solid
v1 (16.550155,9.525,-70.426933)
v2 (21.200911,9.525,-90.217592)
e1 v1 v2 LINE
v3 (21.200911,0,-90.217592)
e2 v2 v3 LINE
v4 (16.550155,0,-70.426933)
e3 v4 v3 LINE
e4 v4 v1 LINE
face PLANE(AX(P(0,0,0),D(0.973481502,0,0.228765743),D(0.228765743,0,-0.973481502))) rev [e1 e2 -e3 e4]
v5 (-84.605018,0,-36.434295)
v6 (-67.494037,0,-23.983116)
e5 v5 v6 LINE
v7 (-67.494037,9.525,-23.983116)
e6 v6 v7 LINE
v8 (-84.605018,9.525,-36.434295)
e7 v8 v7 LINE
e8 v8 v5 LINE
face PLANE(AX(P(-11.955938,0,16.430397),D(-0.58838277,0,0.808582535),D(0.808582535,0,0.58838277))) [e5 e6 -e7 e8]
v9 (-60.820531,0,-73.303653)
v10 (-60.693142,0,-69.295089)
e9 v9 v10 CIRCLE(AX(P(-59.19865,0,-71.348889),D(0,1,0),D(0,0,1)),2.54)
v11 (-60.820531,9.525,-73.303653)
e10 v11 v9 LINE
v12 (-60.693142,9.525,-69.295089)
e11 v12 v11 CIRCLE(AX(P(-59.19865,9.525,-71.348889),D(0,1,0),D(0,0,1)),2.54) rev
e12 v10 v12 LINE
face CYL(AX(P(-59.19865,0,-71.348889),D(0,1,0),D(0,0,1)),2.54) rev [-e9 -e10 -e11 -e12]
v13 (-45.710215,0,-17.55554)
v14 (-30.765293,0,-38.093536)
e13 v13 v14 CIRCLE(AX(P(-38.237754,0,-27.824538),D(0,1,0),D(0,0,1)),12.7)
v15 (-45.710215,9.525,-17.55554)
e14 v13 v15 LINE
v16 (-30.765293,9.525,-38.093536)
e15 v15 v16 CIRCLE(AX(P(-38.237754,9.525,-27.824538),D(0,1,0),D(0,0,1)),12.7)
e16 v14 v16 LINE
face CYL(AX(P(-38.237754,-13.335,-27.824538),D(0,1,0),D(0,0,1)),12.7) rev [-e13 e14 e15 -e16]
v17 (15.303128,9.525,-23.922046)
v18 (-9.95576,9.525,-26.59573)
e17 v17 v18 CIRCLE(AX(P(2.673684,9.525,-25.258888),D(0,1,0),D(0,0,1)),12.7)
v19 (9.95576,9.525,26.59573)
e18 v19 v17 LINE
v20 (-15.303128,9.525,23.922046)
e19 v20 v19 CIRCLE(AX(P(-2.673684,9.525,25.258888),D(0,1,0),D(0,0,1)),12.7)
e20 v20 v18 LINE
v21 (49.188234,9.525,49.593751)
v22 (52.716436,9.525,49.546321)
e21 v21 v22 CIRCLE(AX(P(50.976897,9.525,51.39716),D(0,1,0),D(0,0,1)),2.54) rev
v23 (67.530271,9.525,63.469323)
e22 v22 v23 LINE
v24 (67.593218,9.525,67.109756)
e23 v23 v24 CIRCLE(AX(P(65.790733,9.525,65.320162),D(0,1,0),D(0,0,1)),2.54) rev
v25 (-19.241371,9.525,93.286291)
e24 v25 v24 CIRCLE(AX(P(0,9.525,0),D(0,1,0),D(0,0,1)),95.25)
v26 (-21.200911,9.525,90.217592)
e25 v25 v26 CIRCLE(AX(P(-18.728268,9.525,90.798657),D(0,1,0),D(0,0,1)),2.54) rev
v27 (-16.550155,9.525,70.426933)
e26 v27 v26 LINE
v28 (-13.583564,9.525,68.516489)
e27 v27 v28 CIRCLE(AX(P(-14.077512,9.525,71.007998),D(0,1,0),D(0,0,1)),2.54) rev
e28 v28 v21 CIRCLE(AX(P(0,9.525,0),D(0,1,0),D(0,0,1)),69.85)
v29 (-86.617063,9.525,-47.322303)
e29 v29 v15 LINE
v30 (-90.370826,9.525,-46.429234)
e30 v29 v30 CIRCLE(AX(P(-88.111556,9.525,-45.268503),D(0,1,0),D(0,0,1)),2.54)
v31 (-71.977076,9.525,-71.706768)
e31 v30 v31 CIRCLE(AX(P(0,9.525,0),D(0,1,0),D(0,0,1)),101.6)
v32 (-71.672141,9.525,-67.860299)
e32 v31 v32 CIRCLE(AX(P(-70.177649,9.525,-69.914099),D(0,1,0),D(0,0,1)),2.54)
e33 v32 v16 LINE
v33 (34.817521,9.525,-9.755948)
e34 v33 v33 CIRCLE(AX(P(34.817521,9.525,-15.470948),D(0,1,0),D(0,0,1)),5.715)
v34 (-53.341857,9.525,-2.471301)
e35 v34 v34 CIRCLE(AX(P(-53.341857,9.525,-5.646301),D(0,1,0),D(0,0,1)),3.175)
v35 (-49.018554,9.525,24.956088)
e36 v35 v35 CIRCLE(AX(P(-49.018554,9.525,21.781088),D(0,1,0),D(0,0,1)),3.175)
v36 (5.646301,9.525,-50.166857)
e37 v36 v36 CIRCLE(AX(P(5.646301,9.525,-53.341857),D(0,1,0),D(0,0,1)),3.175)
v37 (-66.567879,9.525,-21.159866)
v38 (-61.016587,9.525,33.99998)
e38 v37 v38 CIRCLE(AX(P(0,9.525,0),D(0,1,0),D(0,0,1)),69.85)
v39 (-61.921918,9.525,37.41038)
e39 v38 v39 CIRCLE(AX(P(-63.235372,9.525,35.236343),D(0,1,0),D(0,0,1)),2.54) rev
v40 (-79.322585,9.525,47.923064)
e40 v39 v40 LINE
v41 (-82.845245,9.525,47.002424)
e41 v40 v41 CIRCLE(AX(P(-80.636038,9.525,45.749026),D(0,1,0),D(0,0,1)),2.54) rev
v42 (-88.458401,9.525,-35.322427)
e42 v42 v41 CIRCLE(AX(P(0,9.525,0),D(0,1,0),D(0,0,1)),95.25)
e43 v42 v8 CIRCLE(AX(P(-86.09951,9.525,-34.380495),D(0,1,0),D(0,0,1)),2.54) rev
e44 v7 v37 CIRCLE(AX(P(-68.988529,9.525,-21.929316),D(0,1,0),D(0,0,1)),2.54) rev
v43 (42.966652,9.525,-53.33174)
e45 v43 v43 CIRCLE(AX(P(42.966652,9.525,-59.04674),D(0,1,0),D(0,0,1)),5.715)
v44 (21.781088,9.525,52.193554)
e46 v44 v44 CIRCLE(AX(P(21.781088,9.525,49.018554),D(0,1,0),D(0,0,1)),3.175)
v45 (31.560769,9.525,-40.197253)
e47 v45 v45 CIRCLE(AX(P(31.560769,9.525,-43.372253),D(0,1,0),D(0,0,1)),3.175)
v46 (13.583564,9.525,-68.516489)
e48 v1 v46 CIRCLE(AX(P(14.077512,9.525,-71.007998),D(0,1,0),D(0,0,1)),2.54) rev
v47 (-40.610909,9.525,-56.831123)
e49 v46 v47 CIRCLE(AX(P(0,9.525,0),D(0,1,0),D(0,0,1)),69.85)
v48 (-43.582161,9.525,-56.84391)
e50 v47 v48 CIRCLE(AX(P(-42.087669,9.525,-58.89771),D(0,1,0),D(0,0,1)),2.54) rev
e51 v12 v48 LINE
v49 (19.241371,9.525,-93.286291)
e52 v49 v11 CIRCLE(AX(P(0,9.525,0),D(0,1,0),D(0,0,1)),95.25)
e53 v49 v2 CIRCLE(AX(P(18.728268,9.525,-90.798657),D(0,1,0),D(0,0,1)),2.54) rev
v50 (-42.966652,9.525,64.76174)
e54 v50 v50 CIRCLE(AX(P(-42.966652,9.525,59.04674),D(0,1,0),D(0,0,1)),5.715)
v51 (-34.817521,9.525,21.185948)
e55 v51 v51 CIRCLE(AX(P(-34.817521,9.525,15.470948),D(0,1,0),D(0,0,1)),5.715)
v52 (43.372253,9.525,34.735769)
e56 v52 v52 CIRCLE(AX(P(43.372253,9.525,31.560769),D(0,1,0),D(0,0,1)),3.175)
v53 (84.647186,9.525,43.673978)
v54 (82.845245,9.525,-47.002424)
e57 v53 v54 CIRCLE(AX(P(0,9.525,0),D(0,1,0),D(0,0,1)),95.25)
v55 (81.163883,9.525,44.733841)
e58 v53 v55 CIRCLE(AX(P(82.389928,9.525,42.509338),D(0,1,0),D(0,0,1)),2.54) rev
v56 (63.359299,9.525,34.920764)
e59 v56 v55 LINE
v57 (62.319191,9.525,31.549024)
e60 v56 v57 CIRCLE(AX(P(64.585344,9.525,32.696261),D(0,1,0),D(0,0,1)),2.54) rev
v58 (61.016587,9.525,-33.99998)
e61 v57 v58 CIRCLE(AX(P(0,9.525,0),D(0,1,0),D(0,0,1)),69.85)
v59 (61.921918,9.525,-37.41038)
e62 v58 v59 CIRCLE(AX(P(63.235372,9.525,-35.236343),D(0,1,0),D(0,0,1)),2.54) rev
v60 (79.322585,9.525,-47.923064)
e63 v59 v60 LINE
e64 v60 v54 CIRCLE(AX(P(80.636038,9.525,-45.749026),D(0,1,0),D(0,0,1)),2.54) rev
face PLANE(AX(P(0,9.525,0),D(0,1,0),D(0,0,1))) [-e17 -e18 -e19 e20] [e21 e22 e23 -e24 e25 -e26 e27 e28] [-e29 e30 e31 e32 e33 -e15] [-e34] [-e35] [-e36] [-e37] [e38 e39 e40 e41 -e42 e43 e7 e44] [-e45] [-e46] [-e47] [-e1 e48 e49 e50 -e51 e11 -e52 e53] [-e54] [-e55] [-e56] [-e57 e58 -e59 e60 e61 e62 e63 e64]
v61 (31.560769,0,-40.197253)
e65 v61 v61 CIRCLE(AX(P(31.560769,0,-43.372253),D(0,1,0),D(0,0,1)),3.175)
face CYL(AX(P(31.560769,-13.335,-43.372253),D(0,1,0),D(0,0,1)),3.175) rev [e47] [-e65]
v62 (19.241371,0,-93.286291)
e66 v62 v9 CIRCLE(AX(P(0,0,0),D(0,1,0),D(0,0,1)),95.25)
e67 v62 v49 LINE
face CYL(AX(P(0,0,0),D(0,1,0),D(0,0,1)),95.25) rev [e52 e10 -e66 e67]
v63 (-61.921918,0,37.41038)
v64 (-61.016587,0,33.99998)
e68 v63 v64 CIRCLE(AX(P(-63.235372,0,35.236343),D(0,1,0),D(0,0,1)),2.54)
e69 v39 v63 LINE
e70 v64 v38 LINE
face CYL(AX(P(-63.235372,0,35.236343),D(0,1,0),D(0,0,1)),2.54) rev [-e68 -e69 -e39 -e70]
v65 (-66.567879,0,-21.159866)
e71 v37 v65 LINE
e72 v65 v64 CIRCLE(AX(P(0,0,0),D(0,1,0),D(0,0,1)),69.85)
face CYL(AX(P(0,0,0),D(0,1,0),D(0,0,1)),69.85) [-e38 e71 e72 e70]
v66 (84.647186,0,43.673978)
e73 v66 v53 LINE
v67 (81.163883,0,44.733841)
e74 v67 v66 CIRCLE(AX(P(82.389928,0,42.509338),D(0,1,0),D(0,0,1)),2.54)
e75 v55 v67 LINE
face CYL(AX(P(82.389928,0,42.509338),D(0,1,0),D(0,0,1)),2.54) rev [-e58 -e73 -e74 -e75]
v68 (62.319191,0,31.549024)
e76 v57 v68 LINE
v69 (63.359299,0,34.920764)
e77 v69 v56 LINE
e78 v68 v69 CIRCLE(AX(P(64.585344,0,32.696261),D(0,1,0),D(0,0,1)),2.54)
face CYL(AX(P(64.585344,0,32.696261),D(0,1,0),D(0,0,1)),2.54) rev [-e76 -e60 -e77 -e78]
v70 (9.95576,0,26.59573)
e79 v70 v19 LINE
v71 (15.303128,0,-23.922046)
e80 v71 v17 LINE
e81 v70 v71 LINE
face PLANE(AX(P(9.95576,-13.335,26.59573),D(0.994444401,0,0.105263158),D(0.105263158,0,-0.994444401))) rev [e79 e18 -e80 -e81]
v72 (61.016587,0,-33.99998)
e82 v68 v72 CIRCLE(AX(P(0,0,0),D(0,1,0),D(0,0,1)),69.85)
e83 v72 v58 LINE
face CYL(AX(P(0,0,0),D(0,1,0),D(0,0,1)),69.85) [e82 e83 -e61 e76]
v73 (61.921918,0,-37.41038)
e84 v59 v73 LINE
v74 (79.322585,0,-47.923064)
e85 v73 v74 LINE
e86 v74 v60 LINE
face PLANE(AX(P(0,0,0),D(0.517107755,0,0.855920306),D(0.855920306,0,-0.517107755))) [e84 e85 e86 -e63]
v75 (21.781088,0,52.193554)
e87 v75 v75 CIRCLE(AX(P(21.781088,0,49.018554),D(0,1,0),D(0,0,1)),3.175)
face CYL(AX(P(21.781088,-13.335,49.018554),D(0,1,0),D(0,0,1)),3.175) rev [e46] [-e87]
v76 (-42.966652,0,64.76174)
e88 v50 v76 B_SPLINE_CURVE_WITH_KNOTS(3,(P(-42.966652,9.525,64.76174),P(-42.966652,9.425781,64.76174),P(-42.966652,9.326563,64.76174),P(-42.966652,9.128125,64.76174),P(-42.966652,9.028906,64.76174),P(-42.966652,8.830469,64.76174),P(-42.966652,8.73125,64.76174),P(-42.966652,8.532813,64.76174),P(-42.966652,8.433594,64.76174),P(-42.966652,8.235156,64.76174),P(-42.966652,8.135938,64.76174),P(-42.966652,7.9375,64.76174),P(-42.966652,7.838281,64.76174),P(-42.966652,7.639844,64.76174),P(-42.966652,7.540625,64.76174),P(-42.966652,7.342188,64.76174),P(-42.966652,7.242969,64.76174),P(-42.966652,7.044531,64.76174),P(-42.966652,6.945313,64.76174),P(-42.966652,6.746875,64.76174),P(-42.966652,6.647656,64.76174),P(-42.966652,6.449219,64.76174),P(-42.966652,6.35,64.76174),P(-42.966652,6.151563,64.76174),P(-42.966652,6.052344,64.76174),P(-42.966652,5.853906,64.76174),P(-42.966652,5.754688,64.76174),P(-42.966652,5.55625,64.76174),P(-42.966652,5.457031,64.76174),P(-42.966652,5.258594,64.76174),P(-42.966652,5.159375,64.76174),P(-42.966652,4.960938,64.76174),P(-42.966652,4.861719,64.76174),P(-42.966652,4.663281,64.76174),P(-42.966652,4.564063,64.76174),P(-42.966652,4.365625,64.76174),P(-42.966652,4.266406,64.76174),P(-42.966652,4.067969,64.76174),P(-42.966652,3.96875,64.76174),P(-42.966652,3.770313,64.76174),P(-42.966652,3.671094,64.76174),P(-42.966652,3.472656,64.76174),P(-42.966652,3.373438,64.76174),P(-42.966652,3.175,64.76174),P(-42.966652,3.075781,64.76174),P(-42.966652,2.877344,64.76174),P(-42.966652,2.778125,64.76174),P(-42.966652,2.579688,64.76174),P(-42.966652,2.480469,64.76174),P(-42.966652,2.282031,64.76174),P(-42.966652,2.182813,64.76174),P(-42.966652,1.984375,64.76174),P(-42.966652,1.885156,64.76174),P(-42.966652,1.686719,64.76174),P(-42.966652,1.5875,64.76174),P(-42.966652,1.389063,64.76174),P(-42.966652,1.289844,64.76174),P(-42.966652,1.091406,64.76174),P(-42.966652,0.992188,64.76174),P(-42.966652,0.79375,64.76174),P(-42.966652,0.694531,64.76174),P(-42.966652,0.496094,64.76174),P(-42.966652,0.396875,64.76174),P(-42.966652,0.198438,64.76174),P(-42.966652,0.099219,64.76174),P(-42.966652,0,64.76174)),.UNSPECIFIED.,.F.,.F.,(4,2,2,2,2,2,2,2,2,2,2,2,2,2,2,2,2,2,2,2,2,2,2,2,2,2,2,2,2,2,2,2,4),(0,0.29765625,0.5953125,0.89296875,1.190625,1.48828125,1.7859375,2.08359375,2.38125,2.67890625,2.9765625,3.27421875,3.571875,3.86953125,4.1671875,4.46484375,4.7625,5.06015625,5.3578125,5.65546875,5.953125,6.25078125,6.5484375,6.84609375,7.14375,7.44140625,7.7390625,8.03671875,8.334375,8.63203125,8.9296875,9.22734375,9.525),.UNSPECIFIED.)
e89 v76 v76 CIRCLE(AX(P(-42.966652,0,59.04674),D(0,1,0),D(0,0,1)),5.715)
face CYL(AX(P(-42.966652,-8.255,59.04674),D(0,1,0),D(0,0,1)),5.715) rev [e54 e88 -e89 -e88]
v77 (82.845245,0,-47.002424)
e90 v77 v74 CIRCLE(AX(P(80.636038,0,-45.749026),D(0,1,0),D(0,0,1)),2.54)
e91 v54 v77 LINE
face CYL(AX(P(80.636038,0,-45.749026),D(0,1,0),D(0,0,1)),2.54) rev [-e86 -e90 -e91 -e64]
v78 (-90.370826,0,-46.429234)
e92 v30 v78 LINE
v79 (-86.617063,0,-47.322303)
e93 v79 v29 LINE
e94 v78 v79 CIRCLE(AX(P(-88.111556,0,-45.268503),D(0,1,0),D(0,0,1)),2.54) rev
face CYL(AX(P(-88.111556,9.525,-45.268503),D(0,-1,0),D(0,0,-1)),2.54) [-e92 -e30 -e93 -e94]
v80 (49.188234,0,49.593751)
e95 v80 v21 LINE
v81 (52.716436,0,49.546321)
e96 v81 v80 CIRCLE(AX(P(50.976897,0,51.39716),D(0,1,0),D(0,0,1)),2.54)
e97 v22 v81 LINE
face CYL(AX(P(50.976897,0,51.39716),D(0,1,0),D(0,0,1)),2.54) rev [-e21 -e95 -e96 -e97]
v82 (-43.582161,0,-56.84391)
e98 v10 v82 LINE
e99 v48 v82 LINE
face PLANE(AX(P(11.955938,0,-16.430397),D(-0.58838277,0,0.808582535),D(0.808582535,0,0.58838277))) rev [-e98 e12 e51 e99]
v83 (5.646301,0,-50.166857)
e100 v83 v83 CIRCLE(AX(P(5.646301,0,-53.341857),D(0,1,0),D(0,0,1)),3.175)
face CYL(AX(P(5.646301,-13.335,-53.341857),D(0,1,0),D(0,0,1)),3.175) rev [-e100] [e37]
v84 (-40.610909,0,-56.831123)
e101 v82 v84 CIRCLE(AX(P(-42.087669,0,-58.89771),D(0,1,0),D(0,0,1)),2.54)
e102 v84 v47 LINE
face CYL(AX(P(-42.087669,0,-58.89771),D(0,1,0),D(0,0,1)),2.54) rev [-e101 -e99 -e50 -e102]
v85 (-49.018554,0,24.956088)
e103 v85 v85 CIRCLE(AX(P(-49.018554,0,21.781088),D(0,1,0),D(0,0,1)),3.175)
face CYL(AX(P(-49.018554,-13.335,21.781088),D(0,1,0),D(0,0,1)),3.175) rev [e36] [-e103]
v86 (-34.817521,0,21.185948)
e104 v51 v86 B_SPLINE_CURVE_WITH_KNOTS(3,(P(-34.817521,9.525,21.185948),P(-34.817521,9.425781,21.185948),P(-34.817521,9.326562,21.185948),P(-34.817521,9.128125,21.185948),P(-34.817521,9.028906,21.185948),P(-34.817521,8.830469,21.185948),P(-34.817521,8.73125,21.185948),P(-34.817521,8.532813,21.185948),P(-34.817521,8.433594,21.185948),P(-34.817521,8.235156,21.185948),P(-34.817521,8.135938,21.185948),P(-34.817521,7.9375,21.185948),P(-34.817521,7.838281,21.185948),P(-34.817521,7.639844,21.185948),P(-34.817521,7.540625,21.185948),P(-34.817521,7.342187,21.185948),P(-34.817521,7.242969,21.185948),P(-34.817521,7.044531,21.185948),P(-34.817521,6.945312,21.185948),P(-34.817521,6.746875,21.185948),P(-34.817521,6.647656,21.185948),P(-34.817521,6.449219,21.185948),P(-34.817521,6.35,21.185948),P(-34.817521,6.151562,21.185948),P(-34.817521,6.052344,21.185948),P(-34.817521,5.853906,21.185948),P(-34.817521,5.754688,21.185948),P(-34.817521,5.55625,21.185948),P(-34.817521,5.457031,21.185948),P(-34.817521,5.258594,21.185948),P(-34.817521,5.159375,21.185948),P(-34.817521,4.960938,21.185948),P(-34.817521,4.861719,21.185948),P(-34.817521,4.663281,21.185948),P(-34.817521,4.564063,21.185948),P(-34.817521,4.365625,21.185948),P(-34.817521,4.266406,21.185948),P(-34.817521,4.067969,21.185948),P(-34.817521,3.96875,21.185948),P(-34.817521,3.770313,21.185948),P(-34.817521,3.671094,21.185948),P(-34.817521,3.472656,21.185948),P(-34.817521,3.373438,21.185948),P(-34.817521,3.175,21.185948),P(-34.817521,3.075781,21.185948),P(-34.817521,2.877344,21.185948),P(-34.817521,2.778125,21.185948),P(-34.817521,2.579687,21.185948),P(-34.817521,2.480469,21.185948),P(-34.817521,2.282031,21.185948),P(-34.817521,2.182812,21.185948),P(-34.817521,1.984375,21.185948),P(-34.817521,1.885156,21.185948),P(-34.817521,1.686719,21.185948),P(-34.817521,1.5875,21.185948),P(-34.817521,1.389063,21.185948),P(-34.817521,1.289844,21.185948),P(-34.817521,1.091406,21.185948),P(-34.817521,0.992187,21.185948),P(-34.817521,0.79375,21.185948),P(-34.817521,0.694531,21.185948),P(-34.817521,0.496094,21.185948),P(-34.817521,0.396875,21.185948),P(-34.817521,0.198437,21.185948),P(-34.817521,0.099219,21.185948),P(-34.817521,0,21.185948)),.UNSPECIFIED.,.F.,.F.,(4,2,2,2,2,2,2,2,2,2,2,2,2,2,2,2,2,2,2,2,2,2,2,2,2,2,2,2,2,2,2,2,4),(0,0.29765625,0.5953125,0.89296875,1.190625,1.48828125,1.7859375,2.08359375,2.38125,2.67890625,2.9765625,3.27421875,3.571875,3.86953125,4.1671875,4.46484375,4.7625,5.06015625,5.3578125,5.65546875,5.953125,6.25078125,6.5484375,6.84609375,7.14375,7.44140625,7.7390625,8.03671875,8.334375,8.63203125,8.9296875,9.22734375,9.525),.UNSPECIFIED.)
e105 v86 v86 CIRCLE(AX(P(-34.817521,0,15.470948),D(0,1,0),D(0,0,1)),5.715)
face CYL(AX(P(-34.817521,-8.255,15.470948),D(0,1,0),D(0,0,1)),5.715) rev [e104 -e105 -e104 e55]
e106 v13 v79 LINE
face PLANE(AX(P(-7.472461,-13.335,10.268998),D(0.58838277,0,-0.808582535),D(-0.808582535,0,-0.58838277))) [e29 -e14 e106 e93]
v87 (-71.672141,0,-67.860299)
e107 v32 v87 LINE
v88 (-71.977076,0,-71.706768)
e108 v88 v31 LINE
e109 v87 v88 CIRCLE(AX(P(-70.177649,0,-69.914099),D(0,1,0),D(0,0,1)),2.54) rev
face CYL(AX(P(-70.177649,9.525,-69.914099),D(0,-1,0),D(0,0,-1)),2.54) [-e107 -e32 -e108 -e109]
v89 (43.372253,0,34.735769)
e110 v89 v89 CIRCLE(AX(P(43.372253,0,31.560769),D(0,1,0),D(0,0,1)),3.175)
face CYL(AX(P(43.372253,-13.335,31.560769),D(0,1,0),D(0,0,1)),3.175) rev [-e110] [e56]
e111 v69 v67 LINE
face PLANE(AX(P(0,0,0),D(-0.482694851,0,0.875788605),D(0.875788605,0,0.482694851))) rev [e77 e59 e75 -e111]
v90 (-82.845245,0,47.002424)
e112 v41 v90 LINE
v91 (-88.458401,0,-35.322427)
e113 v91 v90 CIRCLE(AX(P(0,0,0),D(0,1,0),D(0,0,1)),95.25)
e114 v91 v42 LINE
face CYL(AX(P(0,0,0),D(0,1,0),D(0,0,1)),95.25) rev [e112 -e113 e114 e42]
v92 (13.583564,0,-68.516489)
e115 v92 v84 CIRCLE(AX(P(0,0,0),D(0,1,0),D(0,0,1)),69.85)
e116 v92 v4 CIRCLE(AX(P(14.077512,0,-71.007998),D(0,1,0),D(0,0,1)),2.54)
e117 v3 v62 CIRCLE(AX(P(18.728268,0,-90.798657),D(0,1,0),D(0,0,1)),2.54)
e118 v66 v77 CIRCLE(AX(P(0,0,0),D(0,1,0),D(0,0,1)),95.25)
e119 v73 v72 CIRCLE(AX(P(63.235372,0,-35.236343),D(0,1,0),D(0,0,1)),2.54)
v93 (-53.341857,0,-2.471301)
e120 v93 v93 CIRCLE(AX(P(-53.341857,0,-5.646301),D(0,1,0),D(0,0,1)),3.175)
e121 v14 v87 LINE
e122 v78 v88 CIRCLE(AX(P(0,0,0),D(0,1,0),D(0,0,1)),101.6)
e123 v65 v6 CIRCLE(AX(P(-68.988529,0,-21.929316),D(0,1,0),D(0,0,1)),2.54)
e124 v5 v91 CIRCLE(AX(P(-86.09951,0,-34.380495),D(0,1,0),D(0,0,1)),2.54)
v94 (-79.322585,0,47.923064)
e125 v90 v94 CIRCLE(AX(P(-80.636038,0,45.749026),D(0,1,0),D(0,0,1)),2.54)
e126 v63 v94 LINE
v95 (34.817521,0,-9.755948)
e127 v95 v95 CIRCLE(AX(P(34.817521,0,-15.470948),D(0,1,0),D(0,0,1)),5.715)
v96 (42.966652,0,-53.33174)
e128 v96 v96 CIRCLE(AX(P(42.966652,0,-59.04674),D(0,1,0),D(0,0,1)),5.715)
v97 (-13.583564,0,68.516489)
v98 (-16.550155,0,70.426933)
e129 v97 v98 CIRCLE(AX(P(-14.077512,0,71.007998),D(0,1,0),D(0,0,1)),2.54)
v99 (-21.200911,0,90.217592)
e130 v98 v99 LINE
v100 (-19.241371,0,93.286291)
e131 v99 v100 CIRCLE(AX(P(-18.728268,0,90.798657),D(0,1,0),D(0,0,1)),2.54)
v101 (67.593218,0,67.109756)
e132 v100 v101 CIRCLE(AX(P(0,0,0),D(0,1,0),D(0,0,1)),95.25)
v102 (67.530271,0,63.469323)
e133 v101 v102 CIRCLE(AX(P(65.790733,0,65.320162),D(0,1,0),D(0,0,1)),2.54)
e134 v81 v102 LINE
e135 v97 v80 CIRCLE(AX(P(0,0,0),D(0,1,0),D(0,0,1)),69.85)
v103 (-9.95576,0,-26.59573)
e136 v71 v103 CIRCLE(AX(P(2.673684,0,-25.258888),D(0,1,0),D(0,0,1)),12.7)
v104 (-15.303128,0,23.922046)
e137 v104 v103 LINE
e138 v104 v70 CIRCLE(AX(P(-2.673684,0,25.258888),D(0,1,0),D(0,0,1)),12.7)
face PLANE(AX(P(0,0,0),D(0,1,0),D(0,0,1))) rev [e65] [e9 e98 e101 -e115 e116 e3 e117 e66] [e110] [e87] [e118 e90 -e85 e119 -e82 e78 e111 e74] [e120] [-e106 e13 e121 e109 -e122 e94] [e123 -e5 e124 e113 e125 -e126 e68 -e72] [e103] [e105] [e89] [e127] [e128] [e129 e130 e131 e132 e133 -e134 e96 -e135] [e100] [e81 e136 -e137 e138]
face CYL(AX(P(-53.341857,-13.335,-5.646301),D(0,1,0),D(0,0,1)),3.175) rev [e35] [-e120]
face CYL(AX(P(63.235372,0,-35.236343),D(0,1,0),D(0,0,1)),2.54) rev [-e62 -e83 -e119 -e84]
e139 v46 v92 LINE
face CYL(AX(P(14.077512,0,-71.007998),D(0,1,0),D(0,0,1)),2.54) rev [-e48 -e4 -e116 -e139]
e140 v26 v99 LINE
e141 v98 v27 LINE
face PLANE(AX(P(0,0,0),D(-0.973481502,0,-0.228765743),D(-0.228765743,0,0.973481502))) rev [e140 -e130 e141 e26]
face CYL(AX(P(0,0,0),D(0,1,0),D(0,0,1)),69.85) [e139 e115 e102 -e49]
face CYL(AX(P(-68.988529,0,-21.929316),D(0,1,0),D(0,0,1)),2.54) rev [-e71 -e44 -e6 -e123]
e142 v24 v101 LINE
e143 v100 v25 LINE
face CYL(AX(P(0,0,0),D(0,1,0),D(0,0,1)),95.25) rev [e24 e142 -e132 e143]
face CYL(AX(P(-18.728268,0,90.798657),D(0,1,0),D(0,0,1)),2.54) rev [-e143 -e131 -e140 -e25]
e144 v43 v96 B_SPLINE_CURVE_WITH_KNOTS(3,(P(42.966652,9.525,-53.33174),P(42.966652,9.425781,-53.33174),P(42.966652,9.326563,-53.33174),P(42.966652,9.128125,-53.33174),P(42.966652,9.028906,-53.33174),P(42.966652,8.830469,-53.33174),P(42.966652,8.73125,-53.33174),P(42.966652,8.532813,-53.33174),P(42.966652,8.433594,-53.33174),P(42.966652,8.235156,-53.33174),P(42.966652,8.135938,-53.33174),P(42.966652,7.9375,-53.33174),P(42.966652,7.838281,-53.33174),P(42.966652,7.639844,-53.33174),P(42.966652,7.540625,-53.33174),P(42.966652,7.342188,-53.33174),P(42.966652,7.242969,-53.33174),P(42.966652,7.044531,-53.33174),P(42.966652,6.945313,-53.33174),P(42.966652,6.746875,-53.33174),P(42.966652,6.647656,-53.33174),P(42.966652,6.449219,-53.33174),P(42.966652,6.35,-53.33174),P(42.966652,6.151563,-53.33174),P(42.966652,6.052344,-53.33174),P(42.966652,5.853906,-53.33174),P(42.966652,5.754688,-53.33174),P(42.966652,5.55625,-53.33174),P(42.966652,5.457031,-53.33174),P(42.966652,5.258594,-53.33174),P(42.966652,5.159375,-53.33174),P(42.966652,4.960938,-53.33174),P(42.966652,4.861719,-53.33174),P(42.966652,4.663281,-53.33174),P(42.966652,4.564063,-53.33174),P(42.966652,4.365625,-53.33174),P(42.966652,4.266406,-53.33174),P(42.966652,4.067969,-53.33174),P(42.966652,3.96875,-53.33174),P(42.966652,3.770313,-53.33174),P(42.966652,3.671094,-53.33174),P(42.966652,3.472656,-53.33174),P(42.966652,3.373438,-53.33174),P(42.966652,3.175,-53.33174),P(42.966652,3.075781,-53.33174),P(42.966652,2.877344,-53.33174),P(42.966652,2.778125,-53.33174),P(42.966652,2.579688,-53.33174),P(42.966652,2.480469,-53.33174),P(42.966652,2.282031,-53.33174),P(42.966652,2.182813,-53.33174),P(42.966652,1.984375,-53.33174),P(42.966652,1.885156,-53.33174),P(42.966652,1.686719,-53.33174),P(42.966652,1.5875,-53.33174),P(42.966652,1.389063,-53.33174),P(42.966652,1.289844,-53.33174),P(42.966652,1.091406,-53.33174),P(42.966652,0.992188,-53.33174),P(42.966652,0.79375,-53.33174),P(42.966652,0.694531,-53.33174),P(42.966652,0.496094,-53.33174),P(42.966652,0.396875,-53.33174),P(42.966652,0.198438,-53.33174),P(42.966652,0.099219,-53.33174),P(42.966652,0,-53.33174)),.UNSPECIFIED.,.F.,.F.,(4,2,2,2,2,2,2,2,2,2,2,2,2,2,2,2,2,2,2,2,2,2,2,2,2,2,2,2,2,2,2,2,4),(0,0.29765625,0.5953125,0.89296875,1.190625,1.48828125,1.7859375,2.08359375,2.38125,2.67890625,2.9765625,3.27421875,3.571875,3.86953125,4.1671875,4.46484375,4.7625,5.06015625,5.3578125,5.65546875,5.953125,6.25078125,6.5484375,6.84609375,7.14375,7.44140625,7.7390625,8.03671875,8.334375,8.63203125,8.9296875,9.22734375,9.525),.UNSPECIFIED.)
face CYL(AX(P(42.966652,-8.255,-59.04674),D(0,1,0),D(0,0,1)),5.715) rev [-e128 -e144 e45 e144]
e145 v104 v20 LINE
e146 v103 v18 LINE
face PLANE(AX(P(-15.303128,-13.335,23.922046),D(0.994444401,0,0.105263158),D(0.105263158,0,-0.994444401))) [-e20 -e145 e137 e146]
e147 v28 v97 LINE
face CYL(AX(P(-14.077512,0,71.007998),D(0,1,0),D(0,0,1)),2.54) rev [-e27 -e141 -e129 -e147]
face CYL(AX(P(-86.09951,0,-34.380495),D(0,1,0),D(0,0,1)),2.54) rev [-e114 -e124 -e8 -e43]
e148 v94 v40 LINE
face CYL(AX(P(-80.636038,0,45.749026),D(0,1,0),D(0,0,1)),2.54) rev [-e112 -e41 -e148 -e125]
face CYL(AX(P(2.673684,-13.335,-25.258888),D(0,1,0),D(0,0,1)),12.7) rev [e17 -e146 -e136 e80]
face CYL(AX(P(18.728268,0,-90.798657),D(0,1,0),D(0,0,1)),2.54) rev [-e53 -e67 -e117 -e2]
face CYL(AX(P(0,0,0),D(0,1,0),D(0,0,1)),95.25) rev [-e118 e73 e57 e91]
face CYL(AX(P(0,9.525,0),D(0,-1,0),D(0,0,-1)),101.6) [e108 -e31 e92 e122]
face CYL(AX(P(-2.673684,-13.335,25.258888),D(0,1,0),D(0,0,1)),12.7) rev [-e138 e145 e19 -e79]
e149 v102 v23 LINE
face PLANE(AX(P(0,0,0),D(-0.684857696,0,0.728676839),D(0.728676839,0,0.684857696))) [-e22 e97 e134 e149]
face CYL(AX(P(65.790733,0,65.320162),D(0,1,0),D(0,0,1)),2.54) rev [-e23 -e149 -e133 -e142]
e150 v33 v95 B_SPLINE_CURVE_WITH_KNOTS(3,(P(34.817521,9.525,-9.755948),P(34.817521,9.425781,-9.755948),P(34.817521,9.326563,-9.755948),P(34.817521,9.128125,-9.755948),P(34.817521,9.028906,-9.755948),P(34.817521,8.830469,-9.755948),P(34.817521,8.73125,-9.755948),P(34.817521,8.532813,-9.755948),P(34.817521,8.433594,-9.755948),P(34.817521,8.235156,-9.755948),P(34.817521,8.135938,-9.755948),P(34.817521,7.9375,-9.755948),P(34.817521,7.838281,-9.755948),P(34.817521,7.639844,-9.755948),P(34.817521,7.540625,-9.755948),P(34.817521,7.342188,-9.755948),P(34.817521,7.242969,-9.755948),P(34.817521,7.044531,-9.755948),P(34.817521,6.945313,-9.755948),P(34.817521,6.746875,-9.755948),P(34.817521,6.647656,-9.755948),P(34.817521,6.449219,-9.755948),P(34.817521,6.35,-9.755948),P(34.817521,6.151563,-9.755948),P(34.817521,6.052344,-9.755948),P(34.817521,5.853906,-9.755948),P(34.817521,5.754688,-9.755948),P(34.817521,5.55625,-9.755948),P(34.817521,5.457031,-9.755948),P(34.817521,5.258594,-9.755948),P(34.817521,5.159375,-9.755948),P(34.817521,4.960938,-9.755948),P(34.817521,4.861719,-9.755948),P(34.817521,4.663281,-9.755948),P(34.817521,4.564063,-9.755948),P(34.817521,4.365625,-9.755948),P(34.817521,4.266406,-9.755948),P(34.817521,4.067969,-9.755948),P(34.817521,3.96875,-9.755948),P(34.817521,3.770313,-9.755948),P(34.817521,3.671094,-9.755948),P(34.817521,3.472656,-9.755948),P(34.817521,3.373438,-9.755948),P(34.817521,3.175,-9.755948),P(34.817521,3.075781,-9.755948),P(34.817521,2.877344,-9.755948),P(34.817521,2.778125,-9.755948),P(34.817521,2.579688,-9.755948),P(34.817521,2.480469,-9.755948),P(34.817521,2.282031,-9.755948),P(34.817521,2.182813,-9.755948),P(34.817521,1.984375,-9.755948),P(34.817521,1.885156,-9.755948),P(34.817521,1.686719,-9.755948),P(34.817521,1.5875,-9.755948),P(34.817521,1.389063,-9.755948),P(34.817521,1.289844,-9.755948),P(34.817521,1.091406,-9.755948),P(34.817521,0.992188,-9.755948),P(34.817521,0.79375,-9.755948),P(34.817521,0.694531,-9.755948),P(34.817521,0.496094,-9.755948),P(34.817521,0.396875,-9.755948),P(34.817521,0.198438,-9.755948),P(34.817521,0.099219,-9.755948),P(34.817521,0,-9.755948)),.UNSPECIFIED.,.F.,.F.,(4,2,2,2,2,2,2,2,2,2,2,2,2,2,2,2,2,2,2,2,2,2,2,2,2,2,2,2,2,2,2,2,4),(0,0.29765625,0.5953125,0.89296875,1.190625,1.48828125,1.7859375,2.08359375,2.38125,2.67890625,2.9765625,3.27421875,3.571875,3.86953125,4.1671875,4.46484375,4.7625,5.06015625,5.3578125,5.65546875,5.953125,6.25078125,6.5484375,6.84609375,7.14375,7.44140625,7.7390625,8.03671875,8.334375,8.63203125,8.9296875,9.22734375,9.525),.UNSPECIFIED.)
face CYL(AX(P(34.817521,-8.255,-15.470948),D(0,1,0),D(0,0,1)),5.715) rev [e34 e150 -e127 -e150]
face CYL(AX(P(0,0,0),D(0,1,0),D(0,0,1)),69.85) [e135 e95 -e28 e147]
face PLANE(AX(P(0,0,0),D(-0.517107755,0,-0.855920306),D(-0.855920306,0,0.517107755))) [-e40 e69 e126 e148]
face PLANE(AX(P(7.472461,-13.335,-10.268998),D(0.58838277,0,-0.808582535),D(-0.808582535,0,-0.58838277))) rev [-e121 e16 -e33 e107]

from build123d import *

# Parameters (mm, degrees)
SKETCH1_R           = 101.6
BOSS_EXTRUDE1_DEPTH = 9.525
SKETCH2_R           = 4.7625
SKETCH2_R_2         = 3.175
CUT_EXTRUDE1_DEPTH  = 22.86
SKETCH3_R           = 4.7625
CUT_EXTRUDE2_DEPTH  = 144.999463975
FILLET1_R           = 2.54
FILLET3_R           = 2.54
SKETCH4_R           = 5.715
CUT_EXTRUDE3_DEPTH  = 17.78


with BuildPart() as part:
    # Sketch1 → Boss-Extrude1 (new body)
    with BuildSketch(Plane(origin=(0, 0, 0), x_dir=(1, 0, 0), z_dir=(0, 1, 0))):
        with Locations(Location((0, 0, 0), (0, 0, 90))):
            Circle(SKETCH1_R)
    extrude(amount=BOSS_EXTRUDE1_DEPTH)

    # Sketch2 → Cut-Extrude1 (cut)
    with BuildSketch(Plane(origin=(0, 9.525, 0), x_dir=(1, 0, 0), z_dir=(0, 1, 0))):
        with BuildLine():
            Line((-9.955759688, 26.595729902), (-15.303128109, -23.922045692))
            ThreePointArc((-15.303128109, -23.922045692), (-4.010526316, -37.888331696), (9.955759688, -26.595729902))
            Line((9.955759688, -26.595729902), (15.303128109, 23.922045692))
            ThreePointArc((15.303128109, 23.922045692), (4.010526316, 37.888331696), (-9.955759688, 26.595729902))
        make_face()
        with Locations(Location((34.817520913, 15.470948176, 0), (0, 0, 270))):
            Circle(SKETCH2_R)
        with Locations(Location((-34.817520913, -15.470948176, 0), (0, 0, 270))):
            Circle(SKETCH2_R)
        with BuildLine():
            Line((-30.765292524, 38.093536125), (-87.237043764, 79.186441231))
            Line((-87.237043764, 79.186441231), (-104.485964967, 60.325))
            Line((-104.485964967, 60.325), (-45.710214871, 17.555539727))
            ThreePointArc((-45.710214871, 17.555539727), (-27.968755498, 20.352076753), (-30.765292524, 38.093536125))
        make_face()
        with Locations(Location((5.646300897, 53.341856998, 0), (0, 0, 270))):
            Circle(SKETCH2_R_2)
        with Locations(Location((31.560768513, 43.372252797, 0), (0, 0, 270))):
            Circle(SKETCH2_R_2)
        with Locations(Location((-53.341856998, 5.646300897, 0), (0, 0, 270))):
            Circle(SKETCH2_R_2)
        with Locations(Location((43.372252797, -31.560768513, 0), (0, 0, 270))):
            Circle(SKETCH2_R_2)
        with Locations(Location((-49.018553694, -21.781088485, 0), (0, 0, 270))):
            Circle(SKETCH2_R_2)
        with Locations(Location((21.781088485, -49.018553694, 0), (0, 0, 270))):
            Circle(SKETCH2_R_2)
    extrude(amount=-CUT_EXTRUDE1_DEPTH, mode=Mode.SUBTRACT)

    # Sketch3 → Cut-Extrude2 (cut, through all)
    with BuildSketch(Plane(origin=(0, 9.525, 0), x_dir=(1, 0, 0), z_dir=(0, 1, 0))):
        with BuildLine():
            Line((61.173834056, -33.71623536), (83.418864622, -45.976684582))
            ThreePointArc((83.418864622, -45.976684582), (95.231198209, 1.892455481), (81.526409141, 49.254513627))
            Line((81.526409141, 49.254513627), (59.78603337, 36.119976659))
            ThreePointArc((59.78603337, 36.119976659), (69.83621202, 1.387800686), (61.173834056, -33.71623536))
        make_face()
        with BuildLine():
            ThreePointArc((50.898077232, -47.837310063), (20.160372855, -66.87736438), (-15.979287148, -67.997682918))
            Line((-15.979287148, -67.997682918), (-21.78993702, -92.72411307))
            ThreePointArc((-21.78993702, -92.72411307), (27.491417529, -91.196405972), (69.406468953, -65.232695541))
            Line((69.406468953, -65.232695541), (50.898077232, -47.837310063))
        make_face()
        with BuildLine():
            ThreePointArc((-59.78603337, -36.119976659), (-69.466812234, -7.306469604), (-65.992729528, 22.890656378))
            Line((-65.992729528, 22.890656378), (-87.200441174, 38.322911673))
            ThreePointArc((-87.200441174, 38.322911673), (-95.050717303, -6.15821729), (-81.526409141, -49.254513627))
            Line((-81.526409141, -49.254513627), (-59.78603337, -36.119976659))
        make_face()
        with BuildLine():
            Line((-63.288565419, 71.183705911), (-42.080853774, 55.751450615))
            ThreePointArc((-42.080853774, 55.751450615), (-14.415807175, 68.34622889), (15.979287148, 67.997682918))
            Line((15.979287148, 67.997682918), (21.78993702, 92.72411307))
            ThreePointArc((21.78993702, 92.72411307), (-23.37800943, 92.33651052), (-63.288565419, 71.183705911))
        make_face()
        with Locations(Location((42.966651746, 59.046739645, 0), (0, 0, 270))):
            Circle(SKETCH3_R)
        with Locations(Location((-42.966651746, -59.046739645, 0), (0, 0, 270))):
            Circle(SKETCH3_R)
    extrude(amount=-CUT_EXTRUDE2_DEPTH, mode=Mode.SUBTRACT)

    # Fillet1
    fillet1_edges = [part.edges().sort_by_distance(p)[0] for p in [
        (-74.035185173, 4.7625, -69.579820037),
        (-88.980107519, 4.7625, -49.041823639),
    ]]
    fillet(fillet1_edges, radius=FILLET1_R)

    # Fillet3
    fillet3_edges = [part.edges().sort_by_distance(p)[0] for p in [
        (15.979287148, 4.7625, -67.997682918),
        (-42.080853774, 4.7625, -55.751450615),
        (-63.288565419, 4.7625, -71.183705911),
        (21.78993702, 4.7625, -92.72411307),
        (59.78603337, 4.7625, -36.119976659),
        (81.526409141, 4.7625, -49.254513627),
        (83.418864622, 4.7625, 45.976684582),
        (61.173834056, 4.7625, 33.71623536),
        (-15.979287148, 4.7625, 67.997682918),
        (50.898077232, 4.7625, 47.837310063),
        (69.406468953, 4.7625, 65.232695541),
        (-21.78993702, 4.7625, 92.72411307),
        (-59.78603337, 4.7625, 36.119976659),
        (-81.526409141, 4.7625, 49.254513627),
        (-87.200441174, 4.7625, -38.322911673),
        (-65.992729528, 4.7625, -22.890656378),
    ]]
    fillet(fillet3_edges, radius=FILLET3_R)

    # Sketch4 → Cut-Extrude3 (cut)
    with BuildSketch(Plane(origin=(0, 9.525, 0), x_dir=(1, 0, 0), z_dir=(0, 1, 0))):
        with Locations(Location((42.966651746, 59.046739645, 0), (0, 0, 270))):
            Circle(SKETCH4_R)
        with Locations(Location((-42.966651746, -59.046739645, 0), (0, 0, 270))):
            Circle(SKETCH4_R)
        with Locations(Location((-34.817520913, -15.470948176, 0), (0, 0, 270))):
            Circle(SKETCH4_R)
        with Locations(Location((34.817520913, 15.470948176, 0), (0, 0, 270))):
            Circle(SKETCH4_R)
    extrude(amount=-CUT_EXTRUDE3_DEPTH, mode=Mode.SUBTRACT)


solid = part.part
